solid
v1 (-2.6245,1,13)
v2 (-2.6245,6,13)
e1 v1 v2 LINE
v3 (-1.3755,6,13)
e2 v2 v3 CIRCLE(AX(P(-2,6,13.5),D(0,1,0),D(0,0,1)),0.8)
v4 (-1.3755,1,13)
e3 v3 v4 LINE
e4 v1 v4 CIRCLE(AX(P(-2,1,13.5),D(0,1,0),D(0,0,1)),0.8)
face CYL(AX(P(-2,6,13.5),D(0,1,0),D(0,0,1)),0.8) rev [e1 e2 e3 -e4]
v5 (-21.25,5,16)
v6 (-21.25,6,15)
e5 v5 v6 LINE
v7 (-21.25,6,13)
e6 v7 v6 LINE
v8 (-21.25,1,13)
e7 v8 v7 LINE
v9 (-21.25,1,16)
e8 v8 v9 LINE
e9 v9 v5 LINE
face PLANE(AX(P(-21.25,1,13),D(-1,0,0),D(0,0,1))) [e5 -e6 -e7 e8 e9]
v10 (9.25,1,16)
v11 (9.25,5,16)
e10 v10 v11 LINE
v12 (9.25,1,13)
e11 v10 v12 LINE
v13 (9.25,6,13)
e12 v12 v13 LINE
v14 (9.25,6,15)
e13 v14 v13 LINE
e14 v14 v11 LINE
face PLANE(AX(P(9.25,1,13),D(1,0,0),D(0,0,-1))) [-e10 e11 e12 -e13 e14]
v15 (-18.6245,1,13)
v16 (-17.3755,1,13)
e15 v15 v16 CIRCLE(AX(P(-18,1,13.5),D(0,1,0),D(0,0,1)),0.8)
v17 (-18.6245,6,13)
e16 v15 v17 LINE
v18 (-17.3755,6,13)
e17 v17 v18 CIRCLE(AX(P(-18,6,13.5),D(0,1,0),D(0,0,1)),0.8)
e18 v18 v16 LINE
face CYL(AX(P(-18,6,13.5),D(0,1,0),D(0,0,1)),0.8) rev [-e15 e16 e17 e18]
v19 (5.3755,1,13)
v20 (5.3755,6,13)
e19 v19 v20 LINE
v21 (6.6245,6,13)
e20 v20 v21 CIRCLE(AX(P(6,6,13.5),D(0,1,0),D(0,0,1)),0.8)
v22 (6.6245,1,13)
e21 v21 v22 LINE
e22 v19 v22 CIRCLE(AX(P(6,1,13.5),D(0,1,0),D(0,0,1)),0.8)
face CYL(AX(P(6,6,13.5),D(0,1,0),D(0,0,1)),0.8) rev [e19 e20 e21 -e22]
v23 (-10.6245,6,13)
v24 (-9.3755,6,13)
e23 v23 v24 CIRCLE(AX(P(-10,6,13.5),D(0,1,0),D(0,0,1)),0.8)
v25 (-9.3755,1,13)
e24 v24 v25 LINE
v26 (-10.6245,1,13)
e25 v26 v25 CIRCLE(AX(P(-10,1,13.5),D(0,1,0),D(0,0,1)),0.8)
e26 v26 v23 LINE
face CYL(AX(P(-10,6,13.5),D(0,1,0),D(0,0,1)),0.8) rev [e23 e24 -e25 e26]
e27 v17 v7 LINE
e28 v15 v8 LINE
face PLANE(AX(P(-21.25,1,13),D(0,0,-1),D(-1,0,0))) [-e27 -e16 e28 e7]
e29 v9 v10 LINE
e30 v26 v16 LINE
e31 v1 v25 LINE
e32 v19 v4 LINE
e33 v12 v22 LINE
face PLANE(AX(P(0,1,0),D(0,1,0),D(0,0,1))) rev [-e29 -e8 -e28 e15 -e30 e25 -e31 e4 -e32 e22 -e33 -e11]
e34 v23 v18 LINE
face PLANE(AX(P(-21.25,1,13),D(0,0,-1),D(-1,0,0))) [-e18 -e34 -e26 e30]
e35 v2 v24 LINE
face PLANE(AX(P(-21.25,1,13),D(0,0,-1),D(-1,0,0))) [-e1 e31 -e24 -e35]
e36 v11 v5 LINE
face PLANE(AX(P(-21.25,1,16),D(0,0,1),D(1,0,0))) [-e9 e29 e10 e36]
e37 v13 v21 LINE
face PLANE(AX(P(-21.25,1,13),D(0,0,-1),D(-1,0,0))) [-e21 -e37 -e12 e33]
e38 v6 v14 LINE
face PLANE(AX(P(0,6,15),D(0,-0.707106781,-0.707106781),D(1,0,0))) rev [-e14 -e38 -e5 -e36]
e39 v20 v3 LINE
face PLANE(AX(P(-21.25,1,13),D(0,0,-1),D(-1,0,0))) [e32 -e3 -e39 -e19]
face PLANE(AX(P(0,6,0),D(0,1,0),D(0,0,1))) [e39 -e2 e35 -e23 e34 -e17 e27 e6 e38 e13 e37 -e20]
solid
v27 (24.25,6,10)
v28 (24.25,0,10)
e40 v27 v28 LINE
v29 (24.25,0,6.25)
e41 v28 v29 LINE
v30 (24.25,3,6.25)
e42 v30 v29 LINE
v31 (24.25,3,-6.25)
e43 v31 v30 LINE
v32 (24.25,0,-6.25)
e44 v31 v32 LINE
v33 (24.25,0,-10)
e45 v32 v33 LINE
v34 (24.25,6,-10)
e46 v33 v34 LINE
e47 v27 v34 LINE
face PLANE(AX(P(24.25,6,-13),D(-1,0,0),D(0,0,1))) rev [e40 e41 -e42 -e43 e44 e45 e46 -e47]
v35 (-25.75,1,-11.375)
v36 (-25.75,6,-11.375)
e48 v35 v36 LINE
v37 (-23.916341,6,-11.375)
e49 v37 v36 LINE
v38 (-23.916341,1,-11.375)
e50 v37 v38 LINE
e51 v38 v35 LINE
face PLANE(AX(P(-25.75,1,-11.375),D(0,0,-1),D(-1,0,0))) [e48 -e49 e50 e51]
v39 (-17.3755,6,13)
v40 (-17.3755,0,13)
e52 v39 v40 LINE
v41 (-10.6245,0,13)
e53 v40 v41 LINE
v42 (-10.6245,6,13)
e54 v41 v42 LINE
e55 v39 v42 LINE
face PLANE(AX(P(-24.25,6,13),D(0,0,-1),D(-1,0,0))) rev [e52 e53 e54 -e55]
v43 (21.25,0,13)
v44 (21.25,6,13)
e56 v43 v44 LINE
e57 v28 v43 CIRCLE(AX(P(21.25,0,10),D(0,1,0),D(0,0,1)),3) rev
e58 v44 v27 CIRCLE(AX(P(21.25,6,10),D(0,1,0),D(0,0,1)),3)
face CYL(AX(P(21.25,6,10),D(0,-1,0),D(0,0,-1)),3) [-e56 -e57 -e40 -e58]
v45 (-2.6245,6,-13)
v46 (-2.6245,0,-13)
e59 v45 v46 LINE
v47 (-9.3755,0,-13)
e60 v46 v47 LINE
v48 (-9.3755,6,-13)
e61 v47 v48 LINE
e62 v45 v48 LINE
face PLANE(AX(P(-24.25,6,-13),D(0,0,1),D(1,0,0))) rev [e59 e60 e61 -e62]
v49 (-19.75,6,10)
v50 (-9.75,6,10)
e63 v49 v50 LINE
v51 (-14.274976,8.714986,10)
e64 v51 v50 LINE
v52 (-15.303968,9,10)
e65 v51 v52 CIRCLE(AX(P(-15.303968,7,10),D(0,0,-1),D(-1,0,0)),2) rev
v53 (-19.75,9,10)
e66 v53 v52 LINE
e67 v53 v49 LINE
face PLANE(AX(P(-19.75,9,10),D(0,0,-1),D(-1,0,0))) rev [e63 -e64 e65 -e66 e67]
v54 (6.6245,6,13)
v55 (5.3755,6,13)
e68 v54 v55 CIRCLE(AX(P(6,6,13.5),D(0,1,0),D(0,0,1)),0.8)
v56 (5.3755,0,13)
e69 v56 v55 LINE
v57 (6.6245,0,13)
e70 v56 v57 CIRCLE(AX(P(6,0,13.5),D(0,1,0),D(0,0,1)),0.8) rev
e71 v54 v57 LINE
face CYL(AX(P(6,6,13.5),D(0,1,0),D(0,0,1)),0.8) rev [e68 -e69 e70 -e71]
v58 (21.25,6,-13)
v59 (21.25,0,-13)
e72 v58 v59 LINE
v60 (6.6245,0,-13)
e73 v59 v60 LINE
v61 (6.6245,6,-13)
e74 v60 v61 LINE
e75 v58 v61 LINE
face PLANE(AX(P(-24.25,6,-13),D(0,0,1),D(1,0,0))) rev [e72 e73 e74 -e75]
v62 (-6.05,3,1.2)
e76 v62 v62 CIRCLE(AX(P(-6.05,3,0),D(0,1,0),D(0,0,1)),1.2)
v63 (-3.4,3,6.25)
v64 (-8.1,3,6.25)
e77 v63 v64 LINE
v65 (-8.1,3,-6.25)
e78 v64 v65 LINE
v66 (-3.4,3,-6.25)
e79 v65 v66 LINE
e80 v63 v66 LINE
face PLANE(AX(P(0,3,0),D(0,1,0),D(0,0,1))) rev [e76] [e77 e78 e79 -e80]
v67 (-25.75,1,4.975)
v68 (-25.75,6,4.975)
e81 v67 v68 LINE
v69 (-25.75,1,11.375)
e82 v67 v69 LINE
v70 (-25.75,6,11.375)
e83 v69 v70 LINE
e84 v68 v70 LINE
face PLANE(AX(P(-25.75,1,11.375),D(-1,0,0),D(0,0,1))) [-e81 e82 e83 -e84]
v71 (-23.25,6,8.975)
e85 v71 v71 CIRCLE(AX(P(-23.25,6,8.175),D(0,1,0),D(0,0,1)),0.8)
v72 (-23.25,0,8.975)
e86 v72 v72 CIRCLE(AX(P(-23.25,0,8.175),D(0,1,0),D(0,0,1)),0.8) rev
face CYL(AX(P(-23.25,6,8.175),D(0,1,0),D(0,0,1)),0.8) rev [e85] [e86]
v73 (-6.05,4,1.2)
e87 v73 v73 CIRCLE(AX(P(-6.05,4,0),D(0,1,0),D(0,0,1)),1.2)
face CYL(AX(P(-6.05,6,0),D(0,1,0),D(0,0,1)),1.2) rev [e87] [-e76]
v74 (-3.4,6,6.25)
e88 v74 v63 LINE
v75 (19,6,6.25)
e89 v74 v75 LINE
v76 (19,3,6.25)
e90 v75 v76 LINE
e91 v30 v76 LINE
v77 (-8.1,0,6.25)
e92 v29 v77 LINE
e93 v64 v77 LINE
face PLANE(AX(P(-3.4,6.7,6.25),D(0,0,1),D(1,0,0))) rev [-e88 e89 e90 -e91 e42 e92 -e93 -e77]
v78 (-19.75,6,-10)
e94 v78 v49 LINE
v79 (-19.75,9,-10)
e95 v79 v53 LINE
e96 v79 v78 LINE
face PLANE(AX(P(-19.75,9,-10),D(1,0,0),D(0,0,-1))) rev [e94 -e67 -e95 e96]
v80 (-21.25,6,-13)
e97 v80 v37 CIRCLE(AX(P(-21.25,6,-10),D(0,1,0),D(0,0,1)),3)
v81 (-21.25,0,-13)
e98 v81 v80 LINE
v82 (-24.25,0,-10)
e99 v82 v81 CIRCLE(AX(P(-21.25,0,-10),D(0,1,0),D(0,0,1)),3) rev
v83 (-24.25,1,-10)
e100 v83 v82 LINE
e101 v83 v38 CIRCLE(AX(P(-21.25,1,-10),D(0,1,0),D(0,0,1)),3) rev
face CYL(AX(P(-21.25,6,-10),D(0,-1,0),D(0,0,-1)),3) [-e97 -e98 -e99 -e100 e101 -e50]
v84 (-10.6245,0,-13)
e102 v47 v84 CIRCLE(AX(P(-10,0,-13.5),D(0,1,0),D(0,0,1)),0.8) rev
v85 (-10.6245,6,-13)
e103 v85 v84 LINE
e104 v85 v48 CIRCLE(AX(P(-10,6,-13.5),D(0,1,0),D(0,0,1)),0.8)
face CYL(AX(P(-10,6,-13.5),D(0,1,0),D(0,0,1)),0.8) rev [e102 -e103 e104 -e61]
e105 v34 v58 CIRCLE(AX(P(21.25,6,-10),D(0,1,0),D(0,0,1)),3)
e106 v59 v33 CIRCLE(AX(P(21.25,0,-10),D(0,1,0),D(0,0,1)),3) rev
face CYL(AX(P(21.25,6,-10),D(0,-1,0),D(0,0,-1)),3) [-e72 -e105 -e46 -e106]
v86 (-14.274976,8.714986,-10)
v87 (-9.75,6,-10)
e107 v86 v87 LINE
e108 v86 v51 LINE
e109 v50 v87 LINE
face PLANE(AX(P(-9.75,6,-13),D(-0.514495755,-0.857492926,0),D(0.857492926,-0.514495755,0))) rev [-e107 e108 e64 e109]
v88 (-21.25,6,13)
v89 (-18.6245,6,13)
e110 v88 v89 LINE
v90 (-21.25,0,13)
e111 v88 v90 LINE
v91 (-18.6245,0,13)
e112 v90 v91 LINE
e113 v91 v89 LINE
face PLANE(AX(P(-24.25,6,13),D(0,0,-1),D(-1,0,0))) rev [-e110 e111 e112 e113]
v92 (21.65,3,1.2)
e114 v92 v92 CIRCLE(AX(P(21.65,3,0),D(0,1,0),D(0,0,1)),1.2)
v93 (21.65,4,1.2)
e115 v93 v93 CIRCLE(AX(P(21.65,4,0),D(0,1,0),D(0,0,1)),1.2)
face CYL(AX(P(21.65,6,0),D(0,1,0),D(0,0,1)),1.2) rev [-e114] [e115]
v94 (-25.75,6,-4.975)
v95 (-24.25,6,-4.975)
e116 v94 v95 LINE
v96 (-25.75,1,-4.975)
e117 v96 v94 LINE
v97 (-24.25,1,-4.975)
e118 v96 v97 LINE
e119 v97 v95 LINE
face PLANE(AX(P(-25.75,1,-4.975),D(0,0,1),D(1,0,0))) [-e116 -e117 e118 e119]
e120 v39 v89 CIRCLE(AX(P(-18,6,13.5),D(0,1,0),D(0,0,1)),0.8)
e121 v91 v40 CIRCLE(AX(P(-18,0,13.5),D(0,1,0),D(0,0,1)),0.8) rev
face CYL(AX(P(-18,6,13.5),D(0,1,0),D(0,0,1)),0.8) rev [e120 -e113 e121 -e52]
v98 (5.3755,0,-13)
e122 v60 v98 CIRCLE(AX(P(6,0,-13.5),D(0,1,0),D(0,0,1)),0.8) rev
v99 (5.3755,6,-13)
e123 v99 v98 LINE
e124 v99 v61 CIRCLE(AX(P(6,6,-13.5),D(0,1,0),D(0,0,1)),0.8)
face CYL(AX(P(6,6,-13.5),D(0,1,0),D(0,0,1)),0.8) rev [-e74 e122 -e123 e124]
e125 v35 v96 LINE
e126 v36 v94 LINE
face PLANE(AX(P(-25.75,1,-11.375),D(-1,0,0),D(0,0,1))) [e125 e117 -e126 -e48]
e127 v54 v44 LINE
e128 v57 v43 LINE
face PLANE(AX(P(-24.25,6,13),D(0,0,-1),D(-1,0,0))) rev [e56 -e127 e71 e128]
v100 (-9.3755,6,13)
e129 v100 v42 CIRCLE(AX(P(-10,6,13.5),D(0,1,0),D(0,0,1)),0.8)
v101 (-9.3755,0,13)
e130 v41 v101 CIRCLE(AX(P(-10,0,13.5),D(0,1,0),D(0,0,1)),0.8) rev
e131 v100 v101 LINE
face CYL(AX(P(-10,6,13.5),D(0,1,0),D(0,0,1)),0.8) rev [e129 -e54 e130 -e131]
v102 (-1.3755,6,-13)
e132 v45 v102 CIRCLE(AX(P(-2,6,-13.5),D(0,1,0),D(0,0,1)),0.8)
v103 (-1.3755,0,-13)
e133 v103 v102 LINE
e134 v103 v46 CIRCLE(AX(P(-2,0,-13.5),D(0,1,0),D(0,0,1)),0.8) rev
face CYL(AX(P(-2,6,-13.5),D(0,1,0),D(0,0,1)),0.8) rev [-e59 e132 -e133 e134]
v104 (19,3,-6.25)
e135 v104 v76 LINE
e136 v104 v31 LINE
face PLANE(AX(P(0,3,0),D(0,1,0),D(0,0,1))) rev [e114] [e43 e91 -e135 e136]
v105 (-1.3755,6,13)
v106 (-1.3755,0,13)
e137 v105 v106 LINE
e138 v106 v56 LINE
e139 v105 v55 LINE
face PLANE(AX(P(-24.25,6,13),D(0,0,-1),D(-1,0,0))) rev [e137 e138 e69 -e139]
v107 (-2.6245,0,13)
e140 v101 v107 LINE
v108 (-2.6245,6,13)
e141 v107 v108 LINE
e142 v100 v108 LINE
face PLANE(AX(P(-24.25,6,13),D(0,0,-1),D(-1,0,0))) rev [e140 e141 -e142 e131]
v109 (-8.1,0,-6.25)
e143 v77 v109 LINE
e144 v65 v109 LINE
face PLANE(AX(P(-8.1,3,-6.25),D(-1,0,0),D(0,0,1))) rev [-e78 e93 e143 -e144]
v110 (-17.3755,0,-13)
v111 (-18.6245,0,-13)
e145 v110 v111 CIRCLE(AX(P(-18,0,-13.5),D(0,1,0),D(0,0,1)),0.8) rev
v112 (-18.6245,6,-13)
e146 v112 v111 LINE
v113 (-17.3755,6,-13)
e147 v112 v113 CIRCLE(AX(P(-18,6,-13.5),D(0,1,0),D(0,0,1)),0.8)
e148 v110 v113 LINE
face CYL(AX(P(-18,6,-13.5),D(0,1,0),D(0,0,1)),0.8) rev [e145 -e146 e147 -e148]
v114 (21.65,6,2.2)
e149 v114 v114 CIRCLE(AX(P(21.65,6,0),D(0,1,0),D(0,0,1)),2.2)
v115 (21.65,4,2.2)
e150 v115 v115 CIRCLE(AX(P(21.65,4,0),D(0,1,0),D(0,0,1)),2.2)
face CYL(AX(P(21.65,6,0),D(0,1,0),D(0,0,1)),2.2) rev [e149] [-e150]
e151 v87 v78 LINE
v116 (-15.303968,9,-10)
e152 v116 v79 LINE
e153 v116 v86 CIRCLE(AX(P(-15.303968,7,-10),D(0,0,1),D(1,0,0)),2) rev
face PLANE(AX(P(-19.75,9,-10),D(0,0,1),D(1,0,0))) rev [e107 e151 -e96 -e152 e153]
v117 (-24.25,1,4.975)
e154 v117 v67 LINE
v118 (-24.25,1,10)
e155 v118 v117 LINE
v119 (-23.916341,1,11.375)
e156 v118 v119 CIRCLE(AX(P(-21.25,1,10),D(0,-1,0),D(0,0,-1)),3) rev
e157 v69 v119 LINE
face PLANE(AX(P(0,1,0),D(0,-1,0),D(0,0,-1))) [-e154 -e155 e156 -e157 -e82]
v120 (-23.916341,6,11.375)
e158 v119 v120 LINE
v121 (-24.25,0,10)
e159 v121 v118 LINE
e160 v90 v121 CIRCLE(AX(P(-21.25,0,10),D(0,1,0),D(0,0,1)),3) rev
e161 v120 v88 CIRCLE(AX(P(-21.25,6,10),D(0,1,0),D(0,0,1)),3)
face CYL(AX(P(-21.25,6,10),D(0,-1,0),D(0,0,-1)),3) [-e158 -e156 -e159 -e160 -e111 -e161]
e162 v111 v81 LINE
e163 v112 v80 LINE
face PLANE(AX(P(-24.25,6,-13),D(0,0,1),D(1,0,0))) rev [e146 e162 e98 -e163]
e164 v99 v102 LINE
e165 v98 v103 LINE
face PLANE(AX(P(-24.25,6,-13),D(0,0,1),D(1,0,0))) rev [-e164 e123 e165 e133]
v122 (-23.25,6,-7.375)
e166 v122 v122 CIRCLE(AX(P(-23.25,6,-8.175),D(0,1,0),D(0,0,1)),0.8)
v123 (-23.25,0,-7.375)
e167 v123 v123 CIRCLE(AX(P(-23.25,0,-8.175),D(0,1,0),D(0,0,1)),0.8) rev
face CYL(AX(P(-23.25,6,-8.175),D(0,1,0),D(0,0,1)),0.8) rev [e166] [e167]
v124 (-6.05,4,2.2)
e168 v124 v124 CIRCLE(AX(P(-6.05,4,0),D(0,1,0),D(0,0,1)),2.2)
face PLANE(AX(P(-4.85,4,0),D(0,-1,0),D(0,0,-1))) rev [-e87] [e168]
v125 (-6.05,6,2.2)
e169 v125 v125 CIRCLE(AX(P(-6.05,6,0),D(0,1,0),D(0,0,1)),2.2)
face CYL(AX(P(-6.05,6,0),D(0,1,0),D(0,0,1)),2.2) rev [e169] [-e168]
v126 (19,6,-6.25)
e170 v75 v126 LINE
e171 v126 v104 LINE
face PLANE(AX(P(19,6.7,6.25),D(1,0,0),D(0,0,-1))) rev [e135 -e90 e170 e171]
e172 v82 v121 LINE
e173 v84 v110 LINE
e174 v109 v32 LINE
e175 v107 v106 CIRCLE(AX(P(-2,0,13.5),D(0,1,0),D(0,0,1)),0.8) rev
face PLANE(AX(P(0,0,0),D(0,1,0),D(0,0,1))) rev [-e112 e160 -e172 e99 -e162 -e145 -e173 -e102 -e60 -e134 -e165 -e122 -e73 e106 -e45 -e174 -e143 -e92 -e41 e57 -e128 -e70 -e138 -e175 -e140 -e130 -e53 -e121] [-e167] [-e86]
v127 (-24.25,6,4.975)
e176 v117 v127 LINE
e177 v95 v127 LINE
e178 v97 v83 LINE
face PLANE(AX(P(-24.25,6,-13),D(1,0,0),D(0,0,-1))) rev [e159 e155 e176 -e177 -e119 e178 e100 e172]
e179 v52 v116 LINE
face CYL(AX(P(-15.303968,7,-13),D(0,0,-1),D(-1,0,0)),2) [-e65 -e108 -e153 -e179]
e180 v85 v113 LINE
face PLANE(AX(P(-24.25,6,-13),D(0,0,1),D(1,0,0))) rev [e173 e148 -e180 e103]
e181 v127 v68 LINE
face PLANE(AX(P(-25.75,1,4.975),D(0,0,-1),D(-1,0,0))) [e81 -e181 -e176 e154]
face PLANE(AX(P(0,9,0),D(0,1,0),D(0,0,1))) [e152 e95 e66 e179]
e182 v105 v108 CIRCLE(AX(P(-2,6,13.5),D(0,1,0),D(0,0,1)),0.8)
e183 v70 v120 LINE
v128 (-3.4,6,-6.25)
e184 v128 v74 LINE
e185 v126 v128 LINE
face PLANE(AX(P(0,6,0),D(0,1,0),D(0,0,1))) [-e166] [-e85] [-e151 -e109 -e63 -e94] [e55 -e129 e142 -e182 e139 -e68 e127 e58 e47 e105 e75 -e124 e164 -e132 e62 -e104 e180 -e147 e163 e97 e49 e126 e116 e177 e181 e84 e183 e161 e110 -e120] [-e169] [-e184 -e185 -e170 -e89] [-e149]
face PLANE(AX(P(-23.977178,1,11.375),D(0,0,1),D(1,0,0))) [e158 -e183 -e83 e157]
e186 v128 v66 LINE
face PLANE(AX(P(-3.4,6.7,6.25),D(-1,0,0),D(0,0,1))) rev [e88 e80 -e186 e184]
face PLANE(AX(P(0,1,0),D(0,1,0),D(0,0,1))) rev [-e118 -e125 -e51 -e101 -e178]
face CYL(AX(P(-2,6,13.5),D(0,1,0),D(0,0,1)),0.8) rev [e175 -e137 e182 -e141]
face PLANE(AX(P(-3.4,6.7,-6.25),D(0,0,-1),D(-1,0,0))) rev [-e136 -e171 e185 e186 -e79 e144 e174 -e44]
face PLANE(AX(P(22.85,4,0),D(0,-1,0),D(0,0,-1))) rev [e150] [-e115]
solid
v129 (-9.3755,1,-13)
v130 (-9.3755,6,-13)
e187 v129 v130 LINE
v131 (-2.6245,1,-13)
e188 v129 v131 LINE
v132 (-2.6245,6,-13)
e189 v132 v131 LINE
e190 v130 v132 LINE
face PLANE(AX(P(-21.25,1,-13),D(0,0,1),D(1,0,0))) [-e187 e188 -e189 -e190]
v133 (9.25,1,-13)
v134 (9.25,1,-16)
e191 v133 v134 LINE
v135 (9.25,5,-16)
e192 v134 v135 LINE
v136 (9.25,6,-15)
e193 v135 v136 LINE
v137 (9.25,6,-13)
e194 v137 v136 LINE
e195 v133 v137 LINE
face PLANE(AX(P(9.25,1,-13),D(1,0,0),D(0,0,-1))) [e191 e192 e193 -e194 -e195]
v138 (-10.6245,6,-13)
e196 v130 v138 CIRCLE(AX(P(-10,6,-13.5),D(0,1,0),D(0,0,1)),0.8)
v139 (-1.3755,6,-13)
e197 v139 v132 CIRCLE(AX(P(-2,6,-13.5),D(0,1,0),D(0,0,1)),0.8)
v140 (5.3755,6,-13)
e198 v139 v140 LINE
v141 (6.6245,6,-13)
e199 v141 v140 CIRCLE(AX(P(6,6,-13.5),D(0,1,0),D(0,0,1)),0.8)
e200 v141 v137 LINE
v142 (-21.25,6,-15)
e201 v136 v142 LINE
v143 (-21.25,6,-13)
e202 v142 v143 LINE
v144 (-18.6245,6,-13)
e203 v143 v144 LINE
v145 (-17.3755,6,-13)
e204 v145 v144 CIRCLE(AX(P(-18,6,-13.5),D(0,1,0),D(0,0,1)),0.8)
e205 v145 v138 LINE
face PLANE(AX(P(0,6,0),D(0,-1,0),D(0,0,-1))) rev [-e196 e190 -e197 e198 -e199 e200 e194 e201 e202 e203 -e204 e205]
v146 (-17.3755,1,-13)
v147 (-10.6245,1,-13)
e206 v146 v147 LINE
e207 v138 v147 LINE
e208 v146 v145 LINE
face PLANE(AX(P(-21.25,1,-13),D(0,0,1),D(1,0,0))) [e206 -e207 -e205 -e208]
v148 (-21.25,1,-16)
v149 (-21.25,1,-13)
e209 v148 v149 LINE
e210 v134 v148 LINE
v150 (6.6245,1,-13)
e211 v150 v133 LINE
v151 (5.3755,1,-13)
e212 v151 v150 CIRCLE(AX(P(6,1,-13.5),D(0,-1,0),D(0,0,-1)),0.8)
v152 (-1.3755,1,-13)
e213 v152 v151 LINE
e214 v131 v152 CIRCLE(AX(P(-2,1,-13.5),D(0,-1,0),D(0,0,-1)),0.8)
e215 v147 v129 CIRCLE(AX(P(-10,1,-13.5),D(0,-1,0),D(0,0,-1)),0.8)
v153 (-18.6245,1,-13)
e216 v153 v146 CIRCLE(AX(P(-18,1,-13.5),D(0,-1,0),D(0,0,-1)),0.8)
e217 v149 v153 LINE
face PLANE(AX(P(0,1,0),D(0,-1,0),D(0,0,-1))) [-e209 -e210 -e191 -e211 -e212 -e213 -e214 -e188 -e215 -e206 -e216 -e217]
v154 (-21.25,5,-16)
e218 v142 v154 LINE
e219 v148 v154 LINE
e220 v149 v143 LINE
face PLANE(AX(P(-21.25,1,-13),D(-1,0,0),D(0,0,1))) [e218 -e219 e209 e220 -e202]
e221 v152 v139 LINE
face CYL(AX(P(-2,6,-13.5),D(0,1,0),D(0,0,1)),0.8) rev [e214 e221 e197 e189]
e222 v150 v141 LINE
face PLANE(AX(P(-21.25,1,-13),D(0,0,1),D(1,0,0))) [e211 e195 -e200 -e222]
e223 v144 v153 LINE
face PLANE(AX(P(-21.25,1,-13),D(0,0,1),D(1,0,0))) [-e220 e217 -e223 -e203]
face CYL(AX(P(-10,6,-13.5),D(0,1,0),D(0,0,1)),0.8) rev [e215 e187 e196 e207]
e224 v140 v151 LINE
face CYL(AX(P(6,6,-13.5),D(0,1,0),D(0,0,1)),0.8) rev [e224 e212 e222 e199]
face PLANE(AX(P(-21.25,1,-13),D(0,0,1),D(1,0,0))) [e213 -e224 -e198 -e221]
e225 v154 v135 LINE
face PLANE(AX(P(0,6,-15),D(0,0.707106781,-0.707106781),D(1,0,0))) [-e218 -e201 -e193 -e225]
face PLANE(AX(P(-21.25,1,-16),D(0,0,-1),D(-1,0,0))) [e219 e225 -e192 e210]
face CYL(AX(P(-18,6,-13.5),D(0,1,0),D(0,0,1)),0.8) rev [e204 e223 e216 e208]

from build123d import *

# Parameters (mm, degrees)
SKETCH_1_W                   = 48.5
SKETCH_1_H                   = 26
EXTRUDE_1_DEPTH              = 6
SKETCH_2_W                   = 22.4
SKETCH_2_H                   = 12.5
CUT_EXTRUDE_1_DEPTH          = 6.7
CUT_EXTRUDE_2_DEPTH          = 3
HOLE_WIZARD_M2_1_D           = 2.4
HOLE_WIZARD_M2_1_CBORE_D     = 4.4
HOLE_WIZARD_M2_1_CBORE_DEPTH = 2
SKETCH_6_W                   = 10
SKETCH_6_H                   = 20
EXTRUDE_2_DEPTH              = 3
CUT_EXTRUDE_3_DEPTH          = 35.61303945
FILLET_2_R                   = 2
FILLET_3_R                   = 3
SKETCH_8_W                   = 30.5
SKETCH_8_H                   = 3
EXTRUDE_3_DEPTH              = 5
EXTRUDE_3_2_DEPTH            = 5
M2X0_4_1_DEPTH               = 6
CHAMFER_1_SIZE               = 1
CHAMFER_3_SIZE               = 1
EXTRUDE_5_DEPTH              = 5
M2X0_4_3_OUTLINE_R           = 0.8
M2X0_4_3_DEPTH               = 6


# Read off the part's stored shape, not the designer's step: M2x0.4 螺纹孔1, M2x0.4 螺纹孔3
with BuildPart() as part:
    # 草图1 → 凸台-拉伸1 (new body)
    with BuildSketch(Plane(origin=(0, 0, 0), x_dir=(1, 0, 0), z_dir=(0, 1, 0))):
        Rectangle(SKETCH_1_W, SKETCH_1_H)
    extrude(amount=EXTRUDE_1_DEPTH)

    # 草图2 → 切除-拉伸1 (cut)
    with BuildSketch(Plane.XZ):
        with Locations((7.8, 0)):
            Rectangle(SKETCH_2_W, SKETCH_2_H)
    extrude(amount=-CUT_EXTRUDE_1_DEPTH, mode=Mode.SUBTRACT)

    # 草图3 → 切除-拉伸2 (cut)
    with BuildSketch(Plane.XZ):
        Polygon((19, -6.25), (-3.4, -6.25), (-8.1, -6.25), (-8.1, 6.25), (-3.4, 6.25), (19, 6.25), (23.7, 6.25), (24.25, 6.25), (24.25, -6.25), (23.7, -6.25), align=None)
    extrude(amount=-CUT_EXTRUDE_2_DEPTH, mode=Mode.SUBTRACT)

    # M2 凹头盖螺钉的柱形沉头孔1 (through all)
    with Locations(Plane(origin=(-6.05, 6, 0), x_dir=(0, 0, 1), z_dir=(0, 1, 0))):
        with Locations((0, 0), (0, 27.7)):
            CounterBoreHole(HOLE_WIZARD_M2_1_D / 2, HOLE_WIZARD_M2_1_CBORE_D / 2, HOLE_WIZARD_M2_1_CBORE_DEPTH)

    # 草图6 → 凸台-拉伸2 (add)
    with BuildSketch(Plane(origin=(0, 6, 0), x_dir=(1, 0, 0), z_dir=(0, 1, 0))):
        with Locations((-14.75, 0)):
            Rectangle(SKETCH_6_W, SKETCH_6_H)
    extrude(amount=EXTRUDE_2_DEPTH)

    # 草图7 → 切除-拉伸3 (cut, through all)
    with BuildSketch(Plane.XY.offset(10)):
        Polygon((-9.75, 6), (-14.75, 9), (-9.75, 9), align=None)
    extrude(amount=-CUT_EXTRUDE_3_DEPTH, mode=Mode.SUBTRACT)

    # 圆角2
    fillet_2_edges = [part.edges().sort_by_distance(p)[0] for p in [
        (-14.75, 9, 0),
    ]]
    fillet(fillet_2_edges, radius=FILLET_2_R)

    # 圆角3
    fillet_3_edges = [part.edges().sort_by_distance(p)[0] for p in [
        (24.25, 3, 13),
        (-24.25, 3, 13),
        (-24.25, 3, -13),
        (24.25, 3, -13),
    ]]
    fillet(fillet_3_edges, radius=FILLET_3_R)


with BuildPart() as body_2:
    # 草图8 → 凸台-拉伸3 (new body)
    with BuildSketch(Plane(origin=(0, 6, 0), x_dir=(1, 0, 0), z_dir=(0, 1, 0))):
        with Locations((-6, -14.5)):
            Rectangle(SKETCH_8_W, SKETCH_8_H)
    extrude(amount=-EXTRUDE_3_DEPTH)


with BuildPart() as body_3:
    # 草图8 → Extrude 3 2 (new body)
    with BuildSketch(Plane(origin=(0, 6, 0), x_dir=(1, 0, 0), z_dir=(0, 1, 0))):
        with Locations((-6, 14.5)):
            Rectangle(SKETCH_8_W, SKETCH_8_H)
    extrude(amount=-EXTRUDE_3_2_DEPTH)


with BuildPart() as m2x0_4_1_tool:
    # M2x0.4 螺纹孔1 outline → M2x0.4 螺纹孔1 (new body)
    with BuildSketch(Plane(origin=(0, 0, 0), x_dir=(1, 0, 0), z_dir=(0, 1, 0))):
        with BuildLine():
            ThreePointArc((6.6244998, 13), (6, 14.3), (5.3755002, 13))
            ThreePointArc((5.3755002, 13), (6, 12.7), (6.6244998, 13))
        make_face()
        with BuildLine():
            ThreePointArc((-18.6244998, 13), (-18, 12.7), (-17.3755002, 13))
            ThreePointArc((-17.3755002, 13), (-18, 14.3), (-18.6244998, 13))
        make_face()
        with BuildLine():
            ThreePointArc((-10.6244998, 13), (-10, 12.7), (-9.3755002, 13))
            ThreePointArc((-9.3755002, 13), (-10, 14.3), (-10.6244998, 13))
        make_face()
        with BuildLine():
            ThreePointArc((-2.6244998, 13), (-2, 12.7), (-1.3755002, 13))
            ThreePointArc((-1.3755002, 13), (-2, 14.3), (-2.6244998, 13))
        make_face()
        with BuildLine():
            ThreePointArc((-18.6244998, -13), (-18, -14.3), (-17.3755002, -13))
            ThreePointArc((-17.3755002, -13), (-18, -12.7), (-18.6244998, -13))
        make_face()
        with BuildLine():
            ThreePointArc((6.6244998, -13), (6, -12.7), (5.3755002, -13))
            ThreePointArc((5.3755002, -13), (6, -14.3), (6.6244998, -13))
        make_face()
        with BuildLine():
            ThreePointArc((-1.3755002, -13), (-2, -12.7), (-2.6244998, -13))
            ThreePointArc((-2.6244998, -13), (-2, -14.3), (-1.3755002, -13))
        make_face()
        with BuildLine():
            ThreePointArc((-9.3755002, -13), (-10, -12.7), (-10.6244998, -13))
            ThreePointArc((-10.6244998, -13), (-10, -14.3), (-9.3755002, -13))
        make_face()
    extrude(amount=M2X0_4_1_DEPTH)


with BuildPart() as part_1:
    add(part.part)

    # M2x0.4 螺纹孔1: cut by m2x0_4_1_tool
    add(m2x0_4_1_tool.part, mode=Mode.SUBTRACT)

    # 草图17 → 凸台-拉伸5 (add)
    with BuildSketch(Plane(origin=(0, 6, 0), x_dir=(1, 0, 0), z_dir=(0, 1, 0))):
        Polygon((-23.977178029, 11.375), (-23.894080215, 11.375), (-24.25, 10), (-24.25, 4.975), (-25.75, 4.975), (-25.75, 11.375), align=None)
        Polygon((-25.75, -4.975), (-24.25, -4.975), (-24.25, -10), (-23.853349066, -11.375), (-23.977178029, -11.375), (-25.75, -11.375), align=None)
    extrude(amount=-EXTRUDE_5_DEPTH)

    # M2x0.4 螺纹孔3 outline → M2x0.4 螺纹孔3 (cut)
    with BuildSketch(Plane(origin=(0, 0, 0), x_dir=(1, 0, 0), z_dir=(0, 1, 0))):
        with Locations((-23.25, -8.175)):
            Circle(M2X0_4_3_OUTLINE_R)
        with Locations((-23.25, 8.175)):
            Circle(M2X0_4_3_OUTLINE_R)
    extrude(amount=M2X0_4_3_DEPTH, mode=Mode.SUBTRACT)


with BuildPart() as body_2_1:
    add(body_2.part)

    # M2x0.4 螺纹孔1: cut by m2x0_4_1_tool
    add(m2x0_4_1_tool.part, mode=Mode.SUBTRACT)

    # 倒角1
    chamfer_1_edges = [body_2_1.edges().sort_by_distance(p)[0] for p in [
        (-6, 6, 16),
    ]]
    chamfer(chamfer_1_edges, length=CHAMFER_1_SIZE)


with BuildPart() as body_3_1:
    add(body_3.part)

    # M2x0.4 螺纹孔1: cut by m2x0_4_1_tool
    add(m2x0_4_1_tool.part, mode=Mode.SUBTRACT)

    # 倒角3
    chamfer_3_edges = [body_3_1.edges().sort_by_distance(p)[0] for p in [
        (-6, 6, -16),
    ]]
    chamfer(chamfer_3_edges, length=CHAMFER_3_SIZE)


solid = Compound([part_1.part, body_2_1.part, body_3_1.part])
